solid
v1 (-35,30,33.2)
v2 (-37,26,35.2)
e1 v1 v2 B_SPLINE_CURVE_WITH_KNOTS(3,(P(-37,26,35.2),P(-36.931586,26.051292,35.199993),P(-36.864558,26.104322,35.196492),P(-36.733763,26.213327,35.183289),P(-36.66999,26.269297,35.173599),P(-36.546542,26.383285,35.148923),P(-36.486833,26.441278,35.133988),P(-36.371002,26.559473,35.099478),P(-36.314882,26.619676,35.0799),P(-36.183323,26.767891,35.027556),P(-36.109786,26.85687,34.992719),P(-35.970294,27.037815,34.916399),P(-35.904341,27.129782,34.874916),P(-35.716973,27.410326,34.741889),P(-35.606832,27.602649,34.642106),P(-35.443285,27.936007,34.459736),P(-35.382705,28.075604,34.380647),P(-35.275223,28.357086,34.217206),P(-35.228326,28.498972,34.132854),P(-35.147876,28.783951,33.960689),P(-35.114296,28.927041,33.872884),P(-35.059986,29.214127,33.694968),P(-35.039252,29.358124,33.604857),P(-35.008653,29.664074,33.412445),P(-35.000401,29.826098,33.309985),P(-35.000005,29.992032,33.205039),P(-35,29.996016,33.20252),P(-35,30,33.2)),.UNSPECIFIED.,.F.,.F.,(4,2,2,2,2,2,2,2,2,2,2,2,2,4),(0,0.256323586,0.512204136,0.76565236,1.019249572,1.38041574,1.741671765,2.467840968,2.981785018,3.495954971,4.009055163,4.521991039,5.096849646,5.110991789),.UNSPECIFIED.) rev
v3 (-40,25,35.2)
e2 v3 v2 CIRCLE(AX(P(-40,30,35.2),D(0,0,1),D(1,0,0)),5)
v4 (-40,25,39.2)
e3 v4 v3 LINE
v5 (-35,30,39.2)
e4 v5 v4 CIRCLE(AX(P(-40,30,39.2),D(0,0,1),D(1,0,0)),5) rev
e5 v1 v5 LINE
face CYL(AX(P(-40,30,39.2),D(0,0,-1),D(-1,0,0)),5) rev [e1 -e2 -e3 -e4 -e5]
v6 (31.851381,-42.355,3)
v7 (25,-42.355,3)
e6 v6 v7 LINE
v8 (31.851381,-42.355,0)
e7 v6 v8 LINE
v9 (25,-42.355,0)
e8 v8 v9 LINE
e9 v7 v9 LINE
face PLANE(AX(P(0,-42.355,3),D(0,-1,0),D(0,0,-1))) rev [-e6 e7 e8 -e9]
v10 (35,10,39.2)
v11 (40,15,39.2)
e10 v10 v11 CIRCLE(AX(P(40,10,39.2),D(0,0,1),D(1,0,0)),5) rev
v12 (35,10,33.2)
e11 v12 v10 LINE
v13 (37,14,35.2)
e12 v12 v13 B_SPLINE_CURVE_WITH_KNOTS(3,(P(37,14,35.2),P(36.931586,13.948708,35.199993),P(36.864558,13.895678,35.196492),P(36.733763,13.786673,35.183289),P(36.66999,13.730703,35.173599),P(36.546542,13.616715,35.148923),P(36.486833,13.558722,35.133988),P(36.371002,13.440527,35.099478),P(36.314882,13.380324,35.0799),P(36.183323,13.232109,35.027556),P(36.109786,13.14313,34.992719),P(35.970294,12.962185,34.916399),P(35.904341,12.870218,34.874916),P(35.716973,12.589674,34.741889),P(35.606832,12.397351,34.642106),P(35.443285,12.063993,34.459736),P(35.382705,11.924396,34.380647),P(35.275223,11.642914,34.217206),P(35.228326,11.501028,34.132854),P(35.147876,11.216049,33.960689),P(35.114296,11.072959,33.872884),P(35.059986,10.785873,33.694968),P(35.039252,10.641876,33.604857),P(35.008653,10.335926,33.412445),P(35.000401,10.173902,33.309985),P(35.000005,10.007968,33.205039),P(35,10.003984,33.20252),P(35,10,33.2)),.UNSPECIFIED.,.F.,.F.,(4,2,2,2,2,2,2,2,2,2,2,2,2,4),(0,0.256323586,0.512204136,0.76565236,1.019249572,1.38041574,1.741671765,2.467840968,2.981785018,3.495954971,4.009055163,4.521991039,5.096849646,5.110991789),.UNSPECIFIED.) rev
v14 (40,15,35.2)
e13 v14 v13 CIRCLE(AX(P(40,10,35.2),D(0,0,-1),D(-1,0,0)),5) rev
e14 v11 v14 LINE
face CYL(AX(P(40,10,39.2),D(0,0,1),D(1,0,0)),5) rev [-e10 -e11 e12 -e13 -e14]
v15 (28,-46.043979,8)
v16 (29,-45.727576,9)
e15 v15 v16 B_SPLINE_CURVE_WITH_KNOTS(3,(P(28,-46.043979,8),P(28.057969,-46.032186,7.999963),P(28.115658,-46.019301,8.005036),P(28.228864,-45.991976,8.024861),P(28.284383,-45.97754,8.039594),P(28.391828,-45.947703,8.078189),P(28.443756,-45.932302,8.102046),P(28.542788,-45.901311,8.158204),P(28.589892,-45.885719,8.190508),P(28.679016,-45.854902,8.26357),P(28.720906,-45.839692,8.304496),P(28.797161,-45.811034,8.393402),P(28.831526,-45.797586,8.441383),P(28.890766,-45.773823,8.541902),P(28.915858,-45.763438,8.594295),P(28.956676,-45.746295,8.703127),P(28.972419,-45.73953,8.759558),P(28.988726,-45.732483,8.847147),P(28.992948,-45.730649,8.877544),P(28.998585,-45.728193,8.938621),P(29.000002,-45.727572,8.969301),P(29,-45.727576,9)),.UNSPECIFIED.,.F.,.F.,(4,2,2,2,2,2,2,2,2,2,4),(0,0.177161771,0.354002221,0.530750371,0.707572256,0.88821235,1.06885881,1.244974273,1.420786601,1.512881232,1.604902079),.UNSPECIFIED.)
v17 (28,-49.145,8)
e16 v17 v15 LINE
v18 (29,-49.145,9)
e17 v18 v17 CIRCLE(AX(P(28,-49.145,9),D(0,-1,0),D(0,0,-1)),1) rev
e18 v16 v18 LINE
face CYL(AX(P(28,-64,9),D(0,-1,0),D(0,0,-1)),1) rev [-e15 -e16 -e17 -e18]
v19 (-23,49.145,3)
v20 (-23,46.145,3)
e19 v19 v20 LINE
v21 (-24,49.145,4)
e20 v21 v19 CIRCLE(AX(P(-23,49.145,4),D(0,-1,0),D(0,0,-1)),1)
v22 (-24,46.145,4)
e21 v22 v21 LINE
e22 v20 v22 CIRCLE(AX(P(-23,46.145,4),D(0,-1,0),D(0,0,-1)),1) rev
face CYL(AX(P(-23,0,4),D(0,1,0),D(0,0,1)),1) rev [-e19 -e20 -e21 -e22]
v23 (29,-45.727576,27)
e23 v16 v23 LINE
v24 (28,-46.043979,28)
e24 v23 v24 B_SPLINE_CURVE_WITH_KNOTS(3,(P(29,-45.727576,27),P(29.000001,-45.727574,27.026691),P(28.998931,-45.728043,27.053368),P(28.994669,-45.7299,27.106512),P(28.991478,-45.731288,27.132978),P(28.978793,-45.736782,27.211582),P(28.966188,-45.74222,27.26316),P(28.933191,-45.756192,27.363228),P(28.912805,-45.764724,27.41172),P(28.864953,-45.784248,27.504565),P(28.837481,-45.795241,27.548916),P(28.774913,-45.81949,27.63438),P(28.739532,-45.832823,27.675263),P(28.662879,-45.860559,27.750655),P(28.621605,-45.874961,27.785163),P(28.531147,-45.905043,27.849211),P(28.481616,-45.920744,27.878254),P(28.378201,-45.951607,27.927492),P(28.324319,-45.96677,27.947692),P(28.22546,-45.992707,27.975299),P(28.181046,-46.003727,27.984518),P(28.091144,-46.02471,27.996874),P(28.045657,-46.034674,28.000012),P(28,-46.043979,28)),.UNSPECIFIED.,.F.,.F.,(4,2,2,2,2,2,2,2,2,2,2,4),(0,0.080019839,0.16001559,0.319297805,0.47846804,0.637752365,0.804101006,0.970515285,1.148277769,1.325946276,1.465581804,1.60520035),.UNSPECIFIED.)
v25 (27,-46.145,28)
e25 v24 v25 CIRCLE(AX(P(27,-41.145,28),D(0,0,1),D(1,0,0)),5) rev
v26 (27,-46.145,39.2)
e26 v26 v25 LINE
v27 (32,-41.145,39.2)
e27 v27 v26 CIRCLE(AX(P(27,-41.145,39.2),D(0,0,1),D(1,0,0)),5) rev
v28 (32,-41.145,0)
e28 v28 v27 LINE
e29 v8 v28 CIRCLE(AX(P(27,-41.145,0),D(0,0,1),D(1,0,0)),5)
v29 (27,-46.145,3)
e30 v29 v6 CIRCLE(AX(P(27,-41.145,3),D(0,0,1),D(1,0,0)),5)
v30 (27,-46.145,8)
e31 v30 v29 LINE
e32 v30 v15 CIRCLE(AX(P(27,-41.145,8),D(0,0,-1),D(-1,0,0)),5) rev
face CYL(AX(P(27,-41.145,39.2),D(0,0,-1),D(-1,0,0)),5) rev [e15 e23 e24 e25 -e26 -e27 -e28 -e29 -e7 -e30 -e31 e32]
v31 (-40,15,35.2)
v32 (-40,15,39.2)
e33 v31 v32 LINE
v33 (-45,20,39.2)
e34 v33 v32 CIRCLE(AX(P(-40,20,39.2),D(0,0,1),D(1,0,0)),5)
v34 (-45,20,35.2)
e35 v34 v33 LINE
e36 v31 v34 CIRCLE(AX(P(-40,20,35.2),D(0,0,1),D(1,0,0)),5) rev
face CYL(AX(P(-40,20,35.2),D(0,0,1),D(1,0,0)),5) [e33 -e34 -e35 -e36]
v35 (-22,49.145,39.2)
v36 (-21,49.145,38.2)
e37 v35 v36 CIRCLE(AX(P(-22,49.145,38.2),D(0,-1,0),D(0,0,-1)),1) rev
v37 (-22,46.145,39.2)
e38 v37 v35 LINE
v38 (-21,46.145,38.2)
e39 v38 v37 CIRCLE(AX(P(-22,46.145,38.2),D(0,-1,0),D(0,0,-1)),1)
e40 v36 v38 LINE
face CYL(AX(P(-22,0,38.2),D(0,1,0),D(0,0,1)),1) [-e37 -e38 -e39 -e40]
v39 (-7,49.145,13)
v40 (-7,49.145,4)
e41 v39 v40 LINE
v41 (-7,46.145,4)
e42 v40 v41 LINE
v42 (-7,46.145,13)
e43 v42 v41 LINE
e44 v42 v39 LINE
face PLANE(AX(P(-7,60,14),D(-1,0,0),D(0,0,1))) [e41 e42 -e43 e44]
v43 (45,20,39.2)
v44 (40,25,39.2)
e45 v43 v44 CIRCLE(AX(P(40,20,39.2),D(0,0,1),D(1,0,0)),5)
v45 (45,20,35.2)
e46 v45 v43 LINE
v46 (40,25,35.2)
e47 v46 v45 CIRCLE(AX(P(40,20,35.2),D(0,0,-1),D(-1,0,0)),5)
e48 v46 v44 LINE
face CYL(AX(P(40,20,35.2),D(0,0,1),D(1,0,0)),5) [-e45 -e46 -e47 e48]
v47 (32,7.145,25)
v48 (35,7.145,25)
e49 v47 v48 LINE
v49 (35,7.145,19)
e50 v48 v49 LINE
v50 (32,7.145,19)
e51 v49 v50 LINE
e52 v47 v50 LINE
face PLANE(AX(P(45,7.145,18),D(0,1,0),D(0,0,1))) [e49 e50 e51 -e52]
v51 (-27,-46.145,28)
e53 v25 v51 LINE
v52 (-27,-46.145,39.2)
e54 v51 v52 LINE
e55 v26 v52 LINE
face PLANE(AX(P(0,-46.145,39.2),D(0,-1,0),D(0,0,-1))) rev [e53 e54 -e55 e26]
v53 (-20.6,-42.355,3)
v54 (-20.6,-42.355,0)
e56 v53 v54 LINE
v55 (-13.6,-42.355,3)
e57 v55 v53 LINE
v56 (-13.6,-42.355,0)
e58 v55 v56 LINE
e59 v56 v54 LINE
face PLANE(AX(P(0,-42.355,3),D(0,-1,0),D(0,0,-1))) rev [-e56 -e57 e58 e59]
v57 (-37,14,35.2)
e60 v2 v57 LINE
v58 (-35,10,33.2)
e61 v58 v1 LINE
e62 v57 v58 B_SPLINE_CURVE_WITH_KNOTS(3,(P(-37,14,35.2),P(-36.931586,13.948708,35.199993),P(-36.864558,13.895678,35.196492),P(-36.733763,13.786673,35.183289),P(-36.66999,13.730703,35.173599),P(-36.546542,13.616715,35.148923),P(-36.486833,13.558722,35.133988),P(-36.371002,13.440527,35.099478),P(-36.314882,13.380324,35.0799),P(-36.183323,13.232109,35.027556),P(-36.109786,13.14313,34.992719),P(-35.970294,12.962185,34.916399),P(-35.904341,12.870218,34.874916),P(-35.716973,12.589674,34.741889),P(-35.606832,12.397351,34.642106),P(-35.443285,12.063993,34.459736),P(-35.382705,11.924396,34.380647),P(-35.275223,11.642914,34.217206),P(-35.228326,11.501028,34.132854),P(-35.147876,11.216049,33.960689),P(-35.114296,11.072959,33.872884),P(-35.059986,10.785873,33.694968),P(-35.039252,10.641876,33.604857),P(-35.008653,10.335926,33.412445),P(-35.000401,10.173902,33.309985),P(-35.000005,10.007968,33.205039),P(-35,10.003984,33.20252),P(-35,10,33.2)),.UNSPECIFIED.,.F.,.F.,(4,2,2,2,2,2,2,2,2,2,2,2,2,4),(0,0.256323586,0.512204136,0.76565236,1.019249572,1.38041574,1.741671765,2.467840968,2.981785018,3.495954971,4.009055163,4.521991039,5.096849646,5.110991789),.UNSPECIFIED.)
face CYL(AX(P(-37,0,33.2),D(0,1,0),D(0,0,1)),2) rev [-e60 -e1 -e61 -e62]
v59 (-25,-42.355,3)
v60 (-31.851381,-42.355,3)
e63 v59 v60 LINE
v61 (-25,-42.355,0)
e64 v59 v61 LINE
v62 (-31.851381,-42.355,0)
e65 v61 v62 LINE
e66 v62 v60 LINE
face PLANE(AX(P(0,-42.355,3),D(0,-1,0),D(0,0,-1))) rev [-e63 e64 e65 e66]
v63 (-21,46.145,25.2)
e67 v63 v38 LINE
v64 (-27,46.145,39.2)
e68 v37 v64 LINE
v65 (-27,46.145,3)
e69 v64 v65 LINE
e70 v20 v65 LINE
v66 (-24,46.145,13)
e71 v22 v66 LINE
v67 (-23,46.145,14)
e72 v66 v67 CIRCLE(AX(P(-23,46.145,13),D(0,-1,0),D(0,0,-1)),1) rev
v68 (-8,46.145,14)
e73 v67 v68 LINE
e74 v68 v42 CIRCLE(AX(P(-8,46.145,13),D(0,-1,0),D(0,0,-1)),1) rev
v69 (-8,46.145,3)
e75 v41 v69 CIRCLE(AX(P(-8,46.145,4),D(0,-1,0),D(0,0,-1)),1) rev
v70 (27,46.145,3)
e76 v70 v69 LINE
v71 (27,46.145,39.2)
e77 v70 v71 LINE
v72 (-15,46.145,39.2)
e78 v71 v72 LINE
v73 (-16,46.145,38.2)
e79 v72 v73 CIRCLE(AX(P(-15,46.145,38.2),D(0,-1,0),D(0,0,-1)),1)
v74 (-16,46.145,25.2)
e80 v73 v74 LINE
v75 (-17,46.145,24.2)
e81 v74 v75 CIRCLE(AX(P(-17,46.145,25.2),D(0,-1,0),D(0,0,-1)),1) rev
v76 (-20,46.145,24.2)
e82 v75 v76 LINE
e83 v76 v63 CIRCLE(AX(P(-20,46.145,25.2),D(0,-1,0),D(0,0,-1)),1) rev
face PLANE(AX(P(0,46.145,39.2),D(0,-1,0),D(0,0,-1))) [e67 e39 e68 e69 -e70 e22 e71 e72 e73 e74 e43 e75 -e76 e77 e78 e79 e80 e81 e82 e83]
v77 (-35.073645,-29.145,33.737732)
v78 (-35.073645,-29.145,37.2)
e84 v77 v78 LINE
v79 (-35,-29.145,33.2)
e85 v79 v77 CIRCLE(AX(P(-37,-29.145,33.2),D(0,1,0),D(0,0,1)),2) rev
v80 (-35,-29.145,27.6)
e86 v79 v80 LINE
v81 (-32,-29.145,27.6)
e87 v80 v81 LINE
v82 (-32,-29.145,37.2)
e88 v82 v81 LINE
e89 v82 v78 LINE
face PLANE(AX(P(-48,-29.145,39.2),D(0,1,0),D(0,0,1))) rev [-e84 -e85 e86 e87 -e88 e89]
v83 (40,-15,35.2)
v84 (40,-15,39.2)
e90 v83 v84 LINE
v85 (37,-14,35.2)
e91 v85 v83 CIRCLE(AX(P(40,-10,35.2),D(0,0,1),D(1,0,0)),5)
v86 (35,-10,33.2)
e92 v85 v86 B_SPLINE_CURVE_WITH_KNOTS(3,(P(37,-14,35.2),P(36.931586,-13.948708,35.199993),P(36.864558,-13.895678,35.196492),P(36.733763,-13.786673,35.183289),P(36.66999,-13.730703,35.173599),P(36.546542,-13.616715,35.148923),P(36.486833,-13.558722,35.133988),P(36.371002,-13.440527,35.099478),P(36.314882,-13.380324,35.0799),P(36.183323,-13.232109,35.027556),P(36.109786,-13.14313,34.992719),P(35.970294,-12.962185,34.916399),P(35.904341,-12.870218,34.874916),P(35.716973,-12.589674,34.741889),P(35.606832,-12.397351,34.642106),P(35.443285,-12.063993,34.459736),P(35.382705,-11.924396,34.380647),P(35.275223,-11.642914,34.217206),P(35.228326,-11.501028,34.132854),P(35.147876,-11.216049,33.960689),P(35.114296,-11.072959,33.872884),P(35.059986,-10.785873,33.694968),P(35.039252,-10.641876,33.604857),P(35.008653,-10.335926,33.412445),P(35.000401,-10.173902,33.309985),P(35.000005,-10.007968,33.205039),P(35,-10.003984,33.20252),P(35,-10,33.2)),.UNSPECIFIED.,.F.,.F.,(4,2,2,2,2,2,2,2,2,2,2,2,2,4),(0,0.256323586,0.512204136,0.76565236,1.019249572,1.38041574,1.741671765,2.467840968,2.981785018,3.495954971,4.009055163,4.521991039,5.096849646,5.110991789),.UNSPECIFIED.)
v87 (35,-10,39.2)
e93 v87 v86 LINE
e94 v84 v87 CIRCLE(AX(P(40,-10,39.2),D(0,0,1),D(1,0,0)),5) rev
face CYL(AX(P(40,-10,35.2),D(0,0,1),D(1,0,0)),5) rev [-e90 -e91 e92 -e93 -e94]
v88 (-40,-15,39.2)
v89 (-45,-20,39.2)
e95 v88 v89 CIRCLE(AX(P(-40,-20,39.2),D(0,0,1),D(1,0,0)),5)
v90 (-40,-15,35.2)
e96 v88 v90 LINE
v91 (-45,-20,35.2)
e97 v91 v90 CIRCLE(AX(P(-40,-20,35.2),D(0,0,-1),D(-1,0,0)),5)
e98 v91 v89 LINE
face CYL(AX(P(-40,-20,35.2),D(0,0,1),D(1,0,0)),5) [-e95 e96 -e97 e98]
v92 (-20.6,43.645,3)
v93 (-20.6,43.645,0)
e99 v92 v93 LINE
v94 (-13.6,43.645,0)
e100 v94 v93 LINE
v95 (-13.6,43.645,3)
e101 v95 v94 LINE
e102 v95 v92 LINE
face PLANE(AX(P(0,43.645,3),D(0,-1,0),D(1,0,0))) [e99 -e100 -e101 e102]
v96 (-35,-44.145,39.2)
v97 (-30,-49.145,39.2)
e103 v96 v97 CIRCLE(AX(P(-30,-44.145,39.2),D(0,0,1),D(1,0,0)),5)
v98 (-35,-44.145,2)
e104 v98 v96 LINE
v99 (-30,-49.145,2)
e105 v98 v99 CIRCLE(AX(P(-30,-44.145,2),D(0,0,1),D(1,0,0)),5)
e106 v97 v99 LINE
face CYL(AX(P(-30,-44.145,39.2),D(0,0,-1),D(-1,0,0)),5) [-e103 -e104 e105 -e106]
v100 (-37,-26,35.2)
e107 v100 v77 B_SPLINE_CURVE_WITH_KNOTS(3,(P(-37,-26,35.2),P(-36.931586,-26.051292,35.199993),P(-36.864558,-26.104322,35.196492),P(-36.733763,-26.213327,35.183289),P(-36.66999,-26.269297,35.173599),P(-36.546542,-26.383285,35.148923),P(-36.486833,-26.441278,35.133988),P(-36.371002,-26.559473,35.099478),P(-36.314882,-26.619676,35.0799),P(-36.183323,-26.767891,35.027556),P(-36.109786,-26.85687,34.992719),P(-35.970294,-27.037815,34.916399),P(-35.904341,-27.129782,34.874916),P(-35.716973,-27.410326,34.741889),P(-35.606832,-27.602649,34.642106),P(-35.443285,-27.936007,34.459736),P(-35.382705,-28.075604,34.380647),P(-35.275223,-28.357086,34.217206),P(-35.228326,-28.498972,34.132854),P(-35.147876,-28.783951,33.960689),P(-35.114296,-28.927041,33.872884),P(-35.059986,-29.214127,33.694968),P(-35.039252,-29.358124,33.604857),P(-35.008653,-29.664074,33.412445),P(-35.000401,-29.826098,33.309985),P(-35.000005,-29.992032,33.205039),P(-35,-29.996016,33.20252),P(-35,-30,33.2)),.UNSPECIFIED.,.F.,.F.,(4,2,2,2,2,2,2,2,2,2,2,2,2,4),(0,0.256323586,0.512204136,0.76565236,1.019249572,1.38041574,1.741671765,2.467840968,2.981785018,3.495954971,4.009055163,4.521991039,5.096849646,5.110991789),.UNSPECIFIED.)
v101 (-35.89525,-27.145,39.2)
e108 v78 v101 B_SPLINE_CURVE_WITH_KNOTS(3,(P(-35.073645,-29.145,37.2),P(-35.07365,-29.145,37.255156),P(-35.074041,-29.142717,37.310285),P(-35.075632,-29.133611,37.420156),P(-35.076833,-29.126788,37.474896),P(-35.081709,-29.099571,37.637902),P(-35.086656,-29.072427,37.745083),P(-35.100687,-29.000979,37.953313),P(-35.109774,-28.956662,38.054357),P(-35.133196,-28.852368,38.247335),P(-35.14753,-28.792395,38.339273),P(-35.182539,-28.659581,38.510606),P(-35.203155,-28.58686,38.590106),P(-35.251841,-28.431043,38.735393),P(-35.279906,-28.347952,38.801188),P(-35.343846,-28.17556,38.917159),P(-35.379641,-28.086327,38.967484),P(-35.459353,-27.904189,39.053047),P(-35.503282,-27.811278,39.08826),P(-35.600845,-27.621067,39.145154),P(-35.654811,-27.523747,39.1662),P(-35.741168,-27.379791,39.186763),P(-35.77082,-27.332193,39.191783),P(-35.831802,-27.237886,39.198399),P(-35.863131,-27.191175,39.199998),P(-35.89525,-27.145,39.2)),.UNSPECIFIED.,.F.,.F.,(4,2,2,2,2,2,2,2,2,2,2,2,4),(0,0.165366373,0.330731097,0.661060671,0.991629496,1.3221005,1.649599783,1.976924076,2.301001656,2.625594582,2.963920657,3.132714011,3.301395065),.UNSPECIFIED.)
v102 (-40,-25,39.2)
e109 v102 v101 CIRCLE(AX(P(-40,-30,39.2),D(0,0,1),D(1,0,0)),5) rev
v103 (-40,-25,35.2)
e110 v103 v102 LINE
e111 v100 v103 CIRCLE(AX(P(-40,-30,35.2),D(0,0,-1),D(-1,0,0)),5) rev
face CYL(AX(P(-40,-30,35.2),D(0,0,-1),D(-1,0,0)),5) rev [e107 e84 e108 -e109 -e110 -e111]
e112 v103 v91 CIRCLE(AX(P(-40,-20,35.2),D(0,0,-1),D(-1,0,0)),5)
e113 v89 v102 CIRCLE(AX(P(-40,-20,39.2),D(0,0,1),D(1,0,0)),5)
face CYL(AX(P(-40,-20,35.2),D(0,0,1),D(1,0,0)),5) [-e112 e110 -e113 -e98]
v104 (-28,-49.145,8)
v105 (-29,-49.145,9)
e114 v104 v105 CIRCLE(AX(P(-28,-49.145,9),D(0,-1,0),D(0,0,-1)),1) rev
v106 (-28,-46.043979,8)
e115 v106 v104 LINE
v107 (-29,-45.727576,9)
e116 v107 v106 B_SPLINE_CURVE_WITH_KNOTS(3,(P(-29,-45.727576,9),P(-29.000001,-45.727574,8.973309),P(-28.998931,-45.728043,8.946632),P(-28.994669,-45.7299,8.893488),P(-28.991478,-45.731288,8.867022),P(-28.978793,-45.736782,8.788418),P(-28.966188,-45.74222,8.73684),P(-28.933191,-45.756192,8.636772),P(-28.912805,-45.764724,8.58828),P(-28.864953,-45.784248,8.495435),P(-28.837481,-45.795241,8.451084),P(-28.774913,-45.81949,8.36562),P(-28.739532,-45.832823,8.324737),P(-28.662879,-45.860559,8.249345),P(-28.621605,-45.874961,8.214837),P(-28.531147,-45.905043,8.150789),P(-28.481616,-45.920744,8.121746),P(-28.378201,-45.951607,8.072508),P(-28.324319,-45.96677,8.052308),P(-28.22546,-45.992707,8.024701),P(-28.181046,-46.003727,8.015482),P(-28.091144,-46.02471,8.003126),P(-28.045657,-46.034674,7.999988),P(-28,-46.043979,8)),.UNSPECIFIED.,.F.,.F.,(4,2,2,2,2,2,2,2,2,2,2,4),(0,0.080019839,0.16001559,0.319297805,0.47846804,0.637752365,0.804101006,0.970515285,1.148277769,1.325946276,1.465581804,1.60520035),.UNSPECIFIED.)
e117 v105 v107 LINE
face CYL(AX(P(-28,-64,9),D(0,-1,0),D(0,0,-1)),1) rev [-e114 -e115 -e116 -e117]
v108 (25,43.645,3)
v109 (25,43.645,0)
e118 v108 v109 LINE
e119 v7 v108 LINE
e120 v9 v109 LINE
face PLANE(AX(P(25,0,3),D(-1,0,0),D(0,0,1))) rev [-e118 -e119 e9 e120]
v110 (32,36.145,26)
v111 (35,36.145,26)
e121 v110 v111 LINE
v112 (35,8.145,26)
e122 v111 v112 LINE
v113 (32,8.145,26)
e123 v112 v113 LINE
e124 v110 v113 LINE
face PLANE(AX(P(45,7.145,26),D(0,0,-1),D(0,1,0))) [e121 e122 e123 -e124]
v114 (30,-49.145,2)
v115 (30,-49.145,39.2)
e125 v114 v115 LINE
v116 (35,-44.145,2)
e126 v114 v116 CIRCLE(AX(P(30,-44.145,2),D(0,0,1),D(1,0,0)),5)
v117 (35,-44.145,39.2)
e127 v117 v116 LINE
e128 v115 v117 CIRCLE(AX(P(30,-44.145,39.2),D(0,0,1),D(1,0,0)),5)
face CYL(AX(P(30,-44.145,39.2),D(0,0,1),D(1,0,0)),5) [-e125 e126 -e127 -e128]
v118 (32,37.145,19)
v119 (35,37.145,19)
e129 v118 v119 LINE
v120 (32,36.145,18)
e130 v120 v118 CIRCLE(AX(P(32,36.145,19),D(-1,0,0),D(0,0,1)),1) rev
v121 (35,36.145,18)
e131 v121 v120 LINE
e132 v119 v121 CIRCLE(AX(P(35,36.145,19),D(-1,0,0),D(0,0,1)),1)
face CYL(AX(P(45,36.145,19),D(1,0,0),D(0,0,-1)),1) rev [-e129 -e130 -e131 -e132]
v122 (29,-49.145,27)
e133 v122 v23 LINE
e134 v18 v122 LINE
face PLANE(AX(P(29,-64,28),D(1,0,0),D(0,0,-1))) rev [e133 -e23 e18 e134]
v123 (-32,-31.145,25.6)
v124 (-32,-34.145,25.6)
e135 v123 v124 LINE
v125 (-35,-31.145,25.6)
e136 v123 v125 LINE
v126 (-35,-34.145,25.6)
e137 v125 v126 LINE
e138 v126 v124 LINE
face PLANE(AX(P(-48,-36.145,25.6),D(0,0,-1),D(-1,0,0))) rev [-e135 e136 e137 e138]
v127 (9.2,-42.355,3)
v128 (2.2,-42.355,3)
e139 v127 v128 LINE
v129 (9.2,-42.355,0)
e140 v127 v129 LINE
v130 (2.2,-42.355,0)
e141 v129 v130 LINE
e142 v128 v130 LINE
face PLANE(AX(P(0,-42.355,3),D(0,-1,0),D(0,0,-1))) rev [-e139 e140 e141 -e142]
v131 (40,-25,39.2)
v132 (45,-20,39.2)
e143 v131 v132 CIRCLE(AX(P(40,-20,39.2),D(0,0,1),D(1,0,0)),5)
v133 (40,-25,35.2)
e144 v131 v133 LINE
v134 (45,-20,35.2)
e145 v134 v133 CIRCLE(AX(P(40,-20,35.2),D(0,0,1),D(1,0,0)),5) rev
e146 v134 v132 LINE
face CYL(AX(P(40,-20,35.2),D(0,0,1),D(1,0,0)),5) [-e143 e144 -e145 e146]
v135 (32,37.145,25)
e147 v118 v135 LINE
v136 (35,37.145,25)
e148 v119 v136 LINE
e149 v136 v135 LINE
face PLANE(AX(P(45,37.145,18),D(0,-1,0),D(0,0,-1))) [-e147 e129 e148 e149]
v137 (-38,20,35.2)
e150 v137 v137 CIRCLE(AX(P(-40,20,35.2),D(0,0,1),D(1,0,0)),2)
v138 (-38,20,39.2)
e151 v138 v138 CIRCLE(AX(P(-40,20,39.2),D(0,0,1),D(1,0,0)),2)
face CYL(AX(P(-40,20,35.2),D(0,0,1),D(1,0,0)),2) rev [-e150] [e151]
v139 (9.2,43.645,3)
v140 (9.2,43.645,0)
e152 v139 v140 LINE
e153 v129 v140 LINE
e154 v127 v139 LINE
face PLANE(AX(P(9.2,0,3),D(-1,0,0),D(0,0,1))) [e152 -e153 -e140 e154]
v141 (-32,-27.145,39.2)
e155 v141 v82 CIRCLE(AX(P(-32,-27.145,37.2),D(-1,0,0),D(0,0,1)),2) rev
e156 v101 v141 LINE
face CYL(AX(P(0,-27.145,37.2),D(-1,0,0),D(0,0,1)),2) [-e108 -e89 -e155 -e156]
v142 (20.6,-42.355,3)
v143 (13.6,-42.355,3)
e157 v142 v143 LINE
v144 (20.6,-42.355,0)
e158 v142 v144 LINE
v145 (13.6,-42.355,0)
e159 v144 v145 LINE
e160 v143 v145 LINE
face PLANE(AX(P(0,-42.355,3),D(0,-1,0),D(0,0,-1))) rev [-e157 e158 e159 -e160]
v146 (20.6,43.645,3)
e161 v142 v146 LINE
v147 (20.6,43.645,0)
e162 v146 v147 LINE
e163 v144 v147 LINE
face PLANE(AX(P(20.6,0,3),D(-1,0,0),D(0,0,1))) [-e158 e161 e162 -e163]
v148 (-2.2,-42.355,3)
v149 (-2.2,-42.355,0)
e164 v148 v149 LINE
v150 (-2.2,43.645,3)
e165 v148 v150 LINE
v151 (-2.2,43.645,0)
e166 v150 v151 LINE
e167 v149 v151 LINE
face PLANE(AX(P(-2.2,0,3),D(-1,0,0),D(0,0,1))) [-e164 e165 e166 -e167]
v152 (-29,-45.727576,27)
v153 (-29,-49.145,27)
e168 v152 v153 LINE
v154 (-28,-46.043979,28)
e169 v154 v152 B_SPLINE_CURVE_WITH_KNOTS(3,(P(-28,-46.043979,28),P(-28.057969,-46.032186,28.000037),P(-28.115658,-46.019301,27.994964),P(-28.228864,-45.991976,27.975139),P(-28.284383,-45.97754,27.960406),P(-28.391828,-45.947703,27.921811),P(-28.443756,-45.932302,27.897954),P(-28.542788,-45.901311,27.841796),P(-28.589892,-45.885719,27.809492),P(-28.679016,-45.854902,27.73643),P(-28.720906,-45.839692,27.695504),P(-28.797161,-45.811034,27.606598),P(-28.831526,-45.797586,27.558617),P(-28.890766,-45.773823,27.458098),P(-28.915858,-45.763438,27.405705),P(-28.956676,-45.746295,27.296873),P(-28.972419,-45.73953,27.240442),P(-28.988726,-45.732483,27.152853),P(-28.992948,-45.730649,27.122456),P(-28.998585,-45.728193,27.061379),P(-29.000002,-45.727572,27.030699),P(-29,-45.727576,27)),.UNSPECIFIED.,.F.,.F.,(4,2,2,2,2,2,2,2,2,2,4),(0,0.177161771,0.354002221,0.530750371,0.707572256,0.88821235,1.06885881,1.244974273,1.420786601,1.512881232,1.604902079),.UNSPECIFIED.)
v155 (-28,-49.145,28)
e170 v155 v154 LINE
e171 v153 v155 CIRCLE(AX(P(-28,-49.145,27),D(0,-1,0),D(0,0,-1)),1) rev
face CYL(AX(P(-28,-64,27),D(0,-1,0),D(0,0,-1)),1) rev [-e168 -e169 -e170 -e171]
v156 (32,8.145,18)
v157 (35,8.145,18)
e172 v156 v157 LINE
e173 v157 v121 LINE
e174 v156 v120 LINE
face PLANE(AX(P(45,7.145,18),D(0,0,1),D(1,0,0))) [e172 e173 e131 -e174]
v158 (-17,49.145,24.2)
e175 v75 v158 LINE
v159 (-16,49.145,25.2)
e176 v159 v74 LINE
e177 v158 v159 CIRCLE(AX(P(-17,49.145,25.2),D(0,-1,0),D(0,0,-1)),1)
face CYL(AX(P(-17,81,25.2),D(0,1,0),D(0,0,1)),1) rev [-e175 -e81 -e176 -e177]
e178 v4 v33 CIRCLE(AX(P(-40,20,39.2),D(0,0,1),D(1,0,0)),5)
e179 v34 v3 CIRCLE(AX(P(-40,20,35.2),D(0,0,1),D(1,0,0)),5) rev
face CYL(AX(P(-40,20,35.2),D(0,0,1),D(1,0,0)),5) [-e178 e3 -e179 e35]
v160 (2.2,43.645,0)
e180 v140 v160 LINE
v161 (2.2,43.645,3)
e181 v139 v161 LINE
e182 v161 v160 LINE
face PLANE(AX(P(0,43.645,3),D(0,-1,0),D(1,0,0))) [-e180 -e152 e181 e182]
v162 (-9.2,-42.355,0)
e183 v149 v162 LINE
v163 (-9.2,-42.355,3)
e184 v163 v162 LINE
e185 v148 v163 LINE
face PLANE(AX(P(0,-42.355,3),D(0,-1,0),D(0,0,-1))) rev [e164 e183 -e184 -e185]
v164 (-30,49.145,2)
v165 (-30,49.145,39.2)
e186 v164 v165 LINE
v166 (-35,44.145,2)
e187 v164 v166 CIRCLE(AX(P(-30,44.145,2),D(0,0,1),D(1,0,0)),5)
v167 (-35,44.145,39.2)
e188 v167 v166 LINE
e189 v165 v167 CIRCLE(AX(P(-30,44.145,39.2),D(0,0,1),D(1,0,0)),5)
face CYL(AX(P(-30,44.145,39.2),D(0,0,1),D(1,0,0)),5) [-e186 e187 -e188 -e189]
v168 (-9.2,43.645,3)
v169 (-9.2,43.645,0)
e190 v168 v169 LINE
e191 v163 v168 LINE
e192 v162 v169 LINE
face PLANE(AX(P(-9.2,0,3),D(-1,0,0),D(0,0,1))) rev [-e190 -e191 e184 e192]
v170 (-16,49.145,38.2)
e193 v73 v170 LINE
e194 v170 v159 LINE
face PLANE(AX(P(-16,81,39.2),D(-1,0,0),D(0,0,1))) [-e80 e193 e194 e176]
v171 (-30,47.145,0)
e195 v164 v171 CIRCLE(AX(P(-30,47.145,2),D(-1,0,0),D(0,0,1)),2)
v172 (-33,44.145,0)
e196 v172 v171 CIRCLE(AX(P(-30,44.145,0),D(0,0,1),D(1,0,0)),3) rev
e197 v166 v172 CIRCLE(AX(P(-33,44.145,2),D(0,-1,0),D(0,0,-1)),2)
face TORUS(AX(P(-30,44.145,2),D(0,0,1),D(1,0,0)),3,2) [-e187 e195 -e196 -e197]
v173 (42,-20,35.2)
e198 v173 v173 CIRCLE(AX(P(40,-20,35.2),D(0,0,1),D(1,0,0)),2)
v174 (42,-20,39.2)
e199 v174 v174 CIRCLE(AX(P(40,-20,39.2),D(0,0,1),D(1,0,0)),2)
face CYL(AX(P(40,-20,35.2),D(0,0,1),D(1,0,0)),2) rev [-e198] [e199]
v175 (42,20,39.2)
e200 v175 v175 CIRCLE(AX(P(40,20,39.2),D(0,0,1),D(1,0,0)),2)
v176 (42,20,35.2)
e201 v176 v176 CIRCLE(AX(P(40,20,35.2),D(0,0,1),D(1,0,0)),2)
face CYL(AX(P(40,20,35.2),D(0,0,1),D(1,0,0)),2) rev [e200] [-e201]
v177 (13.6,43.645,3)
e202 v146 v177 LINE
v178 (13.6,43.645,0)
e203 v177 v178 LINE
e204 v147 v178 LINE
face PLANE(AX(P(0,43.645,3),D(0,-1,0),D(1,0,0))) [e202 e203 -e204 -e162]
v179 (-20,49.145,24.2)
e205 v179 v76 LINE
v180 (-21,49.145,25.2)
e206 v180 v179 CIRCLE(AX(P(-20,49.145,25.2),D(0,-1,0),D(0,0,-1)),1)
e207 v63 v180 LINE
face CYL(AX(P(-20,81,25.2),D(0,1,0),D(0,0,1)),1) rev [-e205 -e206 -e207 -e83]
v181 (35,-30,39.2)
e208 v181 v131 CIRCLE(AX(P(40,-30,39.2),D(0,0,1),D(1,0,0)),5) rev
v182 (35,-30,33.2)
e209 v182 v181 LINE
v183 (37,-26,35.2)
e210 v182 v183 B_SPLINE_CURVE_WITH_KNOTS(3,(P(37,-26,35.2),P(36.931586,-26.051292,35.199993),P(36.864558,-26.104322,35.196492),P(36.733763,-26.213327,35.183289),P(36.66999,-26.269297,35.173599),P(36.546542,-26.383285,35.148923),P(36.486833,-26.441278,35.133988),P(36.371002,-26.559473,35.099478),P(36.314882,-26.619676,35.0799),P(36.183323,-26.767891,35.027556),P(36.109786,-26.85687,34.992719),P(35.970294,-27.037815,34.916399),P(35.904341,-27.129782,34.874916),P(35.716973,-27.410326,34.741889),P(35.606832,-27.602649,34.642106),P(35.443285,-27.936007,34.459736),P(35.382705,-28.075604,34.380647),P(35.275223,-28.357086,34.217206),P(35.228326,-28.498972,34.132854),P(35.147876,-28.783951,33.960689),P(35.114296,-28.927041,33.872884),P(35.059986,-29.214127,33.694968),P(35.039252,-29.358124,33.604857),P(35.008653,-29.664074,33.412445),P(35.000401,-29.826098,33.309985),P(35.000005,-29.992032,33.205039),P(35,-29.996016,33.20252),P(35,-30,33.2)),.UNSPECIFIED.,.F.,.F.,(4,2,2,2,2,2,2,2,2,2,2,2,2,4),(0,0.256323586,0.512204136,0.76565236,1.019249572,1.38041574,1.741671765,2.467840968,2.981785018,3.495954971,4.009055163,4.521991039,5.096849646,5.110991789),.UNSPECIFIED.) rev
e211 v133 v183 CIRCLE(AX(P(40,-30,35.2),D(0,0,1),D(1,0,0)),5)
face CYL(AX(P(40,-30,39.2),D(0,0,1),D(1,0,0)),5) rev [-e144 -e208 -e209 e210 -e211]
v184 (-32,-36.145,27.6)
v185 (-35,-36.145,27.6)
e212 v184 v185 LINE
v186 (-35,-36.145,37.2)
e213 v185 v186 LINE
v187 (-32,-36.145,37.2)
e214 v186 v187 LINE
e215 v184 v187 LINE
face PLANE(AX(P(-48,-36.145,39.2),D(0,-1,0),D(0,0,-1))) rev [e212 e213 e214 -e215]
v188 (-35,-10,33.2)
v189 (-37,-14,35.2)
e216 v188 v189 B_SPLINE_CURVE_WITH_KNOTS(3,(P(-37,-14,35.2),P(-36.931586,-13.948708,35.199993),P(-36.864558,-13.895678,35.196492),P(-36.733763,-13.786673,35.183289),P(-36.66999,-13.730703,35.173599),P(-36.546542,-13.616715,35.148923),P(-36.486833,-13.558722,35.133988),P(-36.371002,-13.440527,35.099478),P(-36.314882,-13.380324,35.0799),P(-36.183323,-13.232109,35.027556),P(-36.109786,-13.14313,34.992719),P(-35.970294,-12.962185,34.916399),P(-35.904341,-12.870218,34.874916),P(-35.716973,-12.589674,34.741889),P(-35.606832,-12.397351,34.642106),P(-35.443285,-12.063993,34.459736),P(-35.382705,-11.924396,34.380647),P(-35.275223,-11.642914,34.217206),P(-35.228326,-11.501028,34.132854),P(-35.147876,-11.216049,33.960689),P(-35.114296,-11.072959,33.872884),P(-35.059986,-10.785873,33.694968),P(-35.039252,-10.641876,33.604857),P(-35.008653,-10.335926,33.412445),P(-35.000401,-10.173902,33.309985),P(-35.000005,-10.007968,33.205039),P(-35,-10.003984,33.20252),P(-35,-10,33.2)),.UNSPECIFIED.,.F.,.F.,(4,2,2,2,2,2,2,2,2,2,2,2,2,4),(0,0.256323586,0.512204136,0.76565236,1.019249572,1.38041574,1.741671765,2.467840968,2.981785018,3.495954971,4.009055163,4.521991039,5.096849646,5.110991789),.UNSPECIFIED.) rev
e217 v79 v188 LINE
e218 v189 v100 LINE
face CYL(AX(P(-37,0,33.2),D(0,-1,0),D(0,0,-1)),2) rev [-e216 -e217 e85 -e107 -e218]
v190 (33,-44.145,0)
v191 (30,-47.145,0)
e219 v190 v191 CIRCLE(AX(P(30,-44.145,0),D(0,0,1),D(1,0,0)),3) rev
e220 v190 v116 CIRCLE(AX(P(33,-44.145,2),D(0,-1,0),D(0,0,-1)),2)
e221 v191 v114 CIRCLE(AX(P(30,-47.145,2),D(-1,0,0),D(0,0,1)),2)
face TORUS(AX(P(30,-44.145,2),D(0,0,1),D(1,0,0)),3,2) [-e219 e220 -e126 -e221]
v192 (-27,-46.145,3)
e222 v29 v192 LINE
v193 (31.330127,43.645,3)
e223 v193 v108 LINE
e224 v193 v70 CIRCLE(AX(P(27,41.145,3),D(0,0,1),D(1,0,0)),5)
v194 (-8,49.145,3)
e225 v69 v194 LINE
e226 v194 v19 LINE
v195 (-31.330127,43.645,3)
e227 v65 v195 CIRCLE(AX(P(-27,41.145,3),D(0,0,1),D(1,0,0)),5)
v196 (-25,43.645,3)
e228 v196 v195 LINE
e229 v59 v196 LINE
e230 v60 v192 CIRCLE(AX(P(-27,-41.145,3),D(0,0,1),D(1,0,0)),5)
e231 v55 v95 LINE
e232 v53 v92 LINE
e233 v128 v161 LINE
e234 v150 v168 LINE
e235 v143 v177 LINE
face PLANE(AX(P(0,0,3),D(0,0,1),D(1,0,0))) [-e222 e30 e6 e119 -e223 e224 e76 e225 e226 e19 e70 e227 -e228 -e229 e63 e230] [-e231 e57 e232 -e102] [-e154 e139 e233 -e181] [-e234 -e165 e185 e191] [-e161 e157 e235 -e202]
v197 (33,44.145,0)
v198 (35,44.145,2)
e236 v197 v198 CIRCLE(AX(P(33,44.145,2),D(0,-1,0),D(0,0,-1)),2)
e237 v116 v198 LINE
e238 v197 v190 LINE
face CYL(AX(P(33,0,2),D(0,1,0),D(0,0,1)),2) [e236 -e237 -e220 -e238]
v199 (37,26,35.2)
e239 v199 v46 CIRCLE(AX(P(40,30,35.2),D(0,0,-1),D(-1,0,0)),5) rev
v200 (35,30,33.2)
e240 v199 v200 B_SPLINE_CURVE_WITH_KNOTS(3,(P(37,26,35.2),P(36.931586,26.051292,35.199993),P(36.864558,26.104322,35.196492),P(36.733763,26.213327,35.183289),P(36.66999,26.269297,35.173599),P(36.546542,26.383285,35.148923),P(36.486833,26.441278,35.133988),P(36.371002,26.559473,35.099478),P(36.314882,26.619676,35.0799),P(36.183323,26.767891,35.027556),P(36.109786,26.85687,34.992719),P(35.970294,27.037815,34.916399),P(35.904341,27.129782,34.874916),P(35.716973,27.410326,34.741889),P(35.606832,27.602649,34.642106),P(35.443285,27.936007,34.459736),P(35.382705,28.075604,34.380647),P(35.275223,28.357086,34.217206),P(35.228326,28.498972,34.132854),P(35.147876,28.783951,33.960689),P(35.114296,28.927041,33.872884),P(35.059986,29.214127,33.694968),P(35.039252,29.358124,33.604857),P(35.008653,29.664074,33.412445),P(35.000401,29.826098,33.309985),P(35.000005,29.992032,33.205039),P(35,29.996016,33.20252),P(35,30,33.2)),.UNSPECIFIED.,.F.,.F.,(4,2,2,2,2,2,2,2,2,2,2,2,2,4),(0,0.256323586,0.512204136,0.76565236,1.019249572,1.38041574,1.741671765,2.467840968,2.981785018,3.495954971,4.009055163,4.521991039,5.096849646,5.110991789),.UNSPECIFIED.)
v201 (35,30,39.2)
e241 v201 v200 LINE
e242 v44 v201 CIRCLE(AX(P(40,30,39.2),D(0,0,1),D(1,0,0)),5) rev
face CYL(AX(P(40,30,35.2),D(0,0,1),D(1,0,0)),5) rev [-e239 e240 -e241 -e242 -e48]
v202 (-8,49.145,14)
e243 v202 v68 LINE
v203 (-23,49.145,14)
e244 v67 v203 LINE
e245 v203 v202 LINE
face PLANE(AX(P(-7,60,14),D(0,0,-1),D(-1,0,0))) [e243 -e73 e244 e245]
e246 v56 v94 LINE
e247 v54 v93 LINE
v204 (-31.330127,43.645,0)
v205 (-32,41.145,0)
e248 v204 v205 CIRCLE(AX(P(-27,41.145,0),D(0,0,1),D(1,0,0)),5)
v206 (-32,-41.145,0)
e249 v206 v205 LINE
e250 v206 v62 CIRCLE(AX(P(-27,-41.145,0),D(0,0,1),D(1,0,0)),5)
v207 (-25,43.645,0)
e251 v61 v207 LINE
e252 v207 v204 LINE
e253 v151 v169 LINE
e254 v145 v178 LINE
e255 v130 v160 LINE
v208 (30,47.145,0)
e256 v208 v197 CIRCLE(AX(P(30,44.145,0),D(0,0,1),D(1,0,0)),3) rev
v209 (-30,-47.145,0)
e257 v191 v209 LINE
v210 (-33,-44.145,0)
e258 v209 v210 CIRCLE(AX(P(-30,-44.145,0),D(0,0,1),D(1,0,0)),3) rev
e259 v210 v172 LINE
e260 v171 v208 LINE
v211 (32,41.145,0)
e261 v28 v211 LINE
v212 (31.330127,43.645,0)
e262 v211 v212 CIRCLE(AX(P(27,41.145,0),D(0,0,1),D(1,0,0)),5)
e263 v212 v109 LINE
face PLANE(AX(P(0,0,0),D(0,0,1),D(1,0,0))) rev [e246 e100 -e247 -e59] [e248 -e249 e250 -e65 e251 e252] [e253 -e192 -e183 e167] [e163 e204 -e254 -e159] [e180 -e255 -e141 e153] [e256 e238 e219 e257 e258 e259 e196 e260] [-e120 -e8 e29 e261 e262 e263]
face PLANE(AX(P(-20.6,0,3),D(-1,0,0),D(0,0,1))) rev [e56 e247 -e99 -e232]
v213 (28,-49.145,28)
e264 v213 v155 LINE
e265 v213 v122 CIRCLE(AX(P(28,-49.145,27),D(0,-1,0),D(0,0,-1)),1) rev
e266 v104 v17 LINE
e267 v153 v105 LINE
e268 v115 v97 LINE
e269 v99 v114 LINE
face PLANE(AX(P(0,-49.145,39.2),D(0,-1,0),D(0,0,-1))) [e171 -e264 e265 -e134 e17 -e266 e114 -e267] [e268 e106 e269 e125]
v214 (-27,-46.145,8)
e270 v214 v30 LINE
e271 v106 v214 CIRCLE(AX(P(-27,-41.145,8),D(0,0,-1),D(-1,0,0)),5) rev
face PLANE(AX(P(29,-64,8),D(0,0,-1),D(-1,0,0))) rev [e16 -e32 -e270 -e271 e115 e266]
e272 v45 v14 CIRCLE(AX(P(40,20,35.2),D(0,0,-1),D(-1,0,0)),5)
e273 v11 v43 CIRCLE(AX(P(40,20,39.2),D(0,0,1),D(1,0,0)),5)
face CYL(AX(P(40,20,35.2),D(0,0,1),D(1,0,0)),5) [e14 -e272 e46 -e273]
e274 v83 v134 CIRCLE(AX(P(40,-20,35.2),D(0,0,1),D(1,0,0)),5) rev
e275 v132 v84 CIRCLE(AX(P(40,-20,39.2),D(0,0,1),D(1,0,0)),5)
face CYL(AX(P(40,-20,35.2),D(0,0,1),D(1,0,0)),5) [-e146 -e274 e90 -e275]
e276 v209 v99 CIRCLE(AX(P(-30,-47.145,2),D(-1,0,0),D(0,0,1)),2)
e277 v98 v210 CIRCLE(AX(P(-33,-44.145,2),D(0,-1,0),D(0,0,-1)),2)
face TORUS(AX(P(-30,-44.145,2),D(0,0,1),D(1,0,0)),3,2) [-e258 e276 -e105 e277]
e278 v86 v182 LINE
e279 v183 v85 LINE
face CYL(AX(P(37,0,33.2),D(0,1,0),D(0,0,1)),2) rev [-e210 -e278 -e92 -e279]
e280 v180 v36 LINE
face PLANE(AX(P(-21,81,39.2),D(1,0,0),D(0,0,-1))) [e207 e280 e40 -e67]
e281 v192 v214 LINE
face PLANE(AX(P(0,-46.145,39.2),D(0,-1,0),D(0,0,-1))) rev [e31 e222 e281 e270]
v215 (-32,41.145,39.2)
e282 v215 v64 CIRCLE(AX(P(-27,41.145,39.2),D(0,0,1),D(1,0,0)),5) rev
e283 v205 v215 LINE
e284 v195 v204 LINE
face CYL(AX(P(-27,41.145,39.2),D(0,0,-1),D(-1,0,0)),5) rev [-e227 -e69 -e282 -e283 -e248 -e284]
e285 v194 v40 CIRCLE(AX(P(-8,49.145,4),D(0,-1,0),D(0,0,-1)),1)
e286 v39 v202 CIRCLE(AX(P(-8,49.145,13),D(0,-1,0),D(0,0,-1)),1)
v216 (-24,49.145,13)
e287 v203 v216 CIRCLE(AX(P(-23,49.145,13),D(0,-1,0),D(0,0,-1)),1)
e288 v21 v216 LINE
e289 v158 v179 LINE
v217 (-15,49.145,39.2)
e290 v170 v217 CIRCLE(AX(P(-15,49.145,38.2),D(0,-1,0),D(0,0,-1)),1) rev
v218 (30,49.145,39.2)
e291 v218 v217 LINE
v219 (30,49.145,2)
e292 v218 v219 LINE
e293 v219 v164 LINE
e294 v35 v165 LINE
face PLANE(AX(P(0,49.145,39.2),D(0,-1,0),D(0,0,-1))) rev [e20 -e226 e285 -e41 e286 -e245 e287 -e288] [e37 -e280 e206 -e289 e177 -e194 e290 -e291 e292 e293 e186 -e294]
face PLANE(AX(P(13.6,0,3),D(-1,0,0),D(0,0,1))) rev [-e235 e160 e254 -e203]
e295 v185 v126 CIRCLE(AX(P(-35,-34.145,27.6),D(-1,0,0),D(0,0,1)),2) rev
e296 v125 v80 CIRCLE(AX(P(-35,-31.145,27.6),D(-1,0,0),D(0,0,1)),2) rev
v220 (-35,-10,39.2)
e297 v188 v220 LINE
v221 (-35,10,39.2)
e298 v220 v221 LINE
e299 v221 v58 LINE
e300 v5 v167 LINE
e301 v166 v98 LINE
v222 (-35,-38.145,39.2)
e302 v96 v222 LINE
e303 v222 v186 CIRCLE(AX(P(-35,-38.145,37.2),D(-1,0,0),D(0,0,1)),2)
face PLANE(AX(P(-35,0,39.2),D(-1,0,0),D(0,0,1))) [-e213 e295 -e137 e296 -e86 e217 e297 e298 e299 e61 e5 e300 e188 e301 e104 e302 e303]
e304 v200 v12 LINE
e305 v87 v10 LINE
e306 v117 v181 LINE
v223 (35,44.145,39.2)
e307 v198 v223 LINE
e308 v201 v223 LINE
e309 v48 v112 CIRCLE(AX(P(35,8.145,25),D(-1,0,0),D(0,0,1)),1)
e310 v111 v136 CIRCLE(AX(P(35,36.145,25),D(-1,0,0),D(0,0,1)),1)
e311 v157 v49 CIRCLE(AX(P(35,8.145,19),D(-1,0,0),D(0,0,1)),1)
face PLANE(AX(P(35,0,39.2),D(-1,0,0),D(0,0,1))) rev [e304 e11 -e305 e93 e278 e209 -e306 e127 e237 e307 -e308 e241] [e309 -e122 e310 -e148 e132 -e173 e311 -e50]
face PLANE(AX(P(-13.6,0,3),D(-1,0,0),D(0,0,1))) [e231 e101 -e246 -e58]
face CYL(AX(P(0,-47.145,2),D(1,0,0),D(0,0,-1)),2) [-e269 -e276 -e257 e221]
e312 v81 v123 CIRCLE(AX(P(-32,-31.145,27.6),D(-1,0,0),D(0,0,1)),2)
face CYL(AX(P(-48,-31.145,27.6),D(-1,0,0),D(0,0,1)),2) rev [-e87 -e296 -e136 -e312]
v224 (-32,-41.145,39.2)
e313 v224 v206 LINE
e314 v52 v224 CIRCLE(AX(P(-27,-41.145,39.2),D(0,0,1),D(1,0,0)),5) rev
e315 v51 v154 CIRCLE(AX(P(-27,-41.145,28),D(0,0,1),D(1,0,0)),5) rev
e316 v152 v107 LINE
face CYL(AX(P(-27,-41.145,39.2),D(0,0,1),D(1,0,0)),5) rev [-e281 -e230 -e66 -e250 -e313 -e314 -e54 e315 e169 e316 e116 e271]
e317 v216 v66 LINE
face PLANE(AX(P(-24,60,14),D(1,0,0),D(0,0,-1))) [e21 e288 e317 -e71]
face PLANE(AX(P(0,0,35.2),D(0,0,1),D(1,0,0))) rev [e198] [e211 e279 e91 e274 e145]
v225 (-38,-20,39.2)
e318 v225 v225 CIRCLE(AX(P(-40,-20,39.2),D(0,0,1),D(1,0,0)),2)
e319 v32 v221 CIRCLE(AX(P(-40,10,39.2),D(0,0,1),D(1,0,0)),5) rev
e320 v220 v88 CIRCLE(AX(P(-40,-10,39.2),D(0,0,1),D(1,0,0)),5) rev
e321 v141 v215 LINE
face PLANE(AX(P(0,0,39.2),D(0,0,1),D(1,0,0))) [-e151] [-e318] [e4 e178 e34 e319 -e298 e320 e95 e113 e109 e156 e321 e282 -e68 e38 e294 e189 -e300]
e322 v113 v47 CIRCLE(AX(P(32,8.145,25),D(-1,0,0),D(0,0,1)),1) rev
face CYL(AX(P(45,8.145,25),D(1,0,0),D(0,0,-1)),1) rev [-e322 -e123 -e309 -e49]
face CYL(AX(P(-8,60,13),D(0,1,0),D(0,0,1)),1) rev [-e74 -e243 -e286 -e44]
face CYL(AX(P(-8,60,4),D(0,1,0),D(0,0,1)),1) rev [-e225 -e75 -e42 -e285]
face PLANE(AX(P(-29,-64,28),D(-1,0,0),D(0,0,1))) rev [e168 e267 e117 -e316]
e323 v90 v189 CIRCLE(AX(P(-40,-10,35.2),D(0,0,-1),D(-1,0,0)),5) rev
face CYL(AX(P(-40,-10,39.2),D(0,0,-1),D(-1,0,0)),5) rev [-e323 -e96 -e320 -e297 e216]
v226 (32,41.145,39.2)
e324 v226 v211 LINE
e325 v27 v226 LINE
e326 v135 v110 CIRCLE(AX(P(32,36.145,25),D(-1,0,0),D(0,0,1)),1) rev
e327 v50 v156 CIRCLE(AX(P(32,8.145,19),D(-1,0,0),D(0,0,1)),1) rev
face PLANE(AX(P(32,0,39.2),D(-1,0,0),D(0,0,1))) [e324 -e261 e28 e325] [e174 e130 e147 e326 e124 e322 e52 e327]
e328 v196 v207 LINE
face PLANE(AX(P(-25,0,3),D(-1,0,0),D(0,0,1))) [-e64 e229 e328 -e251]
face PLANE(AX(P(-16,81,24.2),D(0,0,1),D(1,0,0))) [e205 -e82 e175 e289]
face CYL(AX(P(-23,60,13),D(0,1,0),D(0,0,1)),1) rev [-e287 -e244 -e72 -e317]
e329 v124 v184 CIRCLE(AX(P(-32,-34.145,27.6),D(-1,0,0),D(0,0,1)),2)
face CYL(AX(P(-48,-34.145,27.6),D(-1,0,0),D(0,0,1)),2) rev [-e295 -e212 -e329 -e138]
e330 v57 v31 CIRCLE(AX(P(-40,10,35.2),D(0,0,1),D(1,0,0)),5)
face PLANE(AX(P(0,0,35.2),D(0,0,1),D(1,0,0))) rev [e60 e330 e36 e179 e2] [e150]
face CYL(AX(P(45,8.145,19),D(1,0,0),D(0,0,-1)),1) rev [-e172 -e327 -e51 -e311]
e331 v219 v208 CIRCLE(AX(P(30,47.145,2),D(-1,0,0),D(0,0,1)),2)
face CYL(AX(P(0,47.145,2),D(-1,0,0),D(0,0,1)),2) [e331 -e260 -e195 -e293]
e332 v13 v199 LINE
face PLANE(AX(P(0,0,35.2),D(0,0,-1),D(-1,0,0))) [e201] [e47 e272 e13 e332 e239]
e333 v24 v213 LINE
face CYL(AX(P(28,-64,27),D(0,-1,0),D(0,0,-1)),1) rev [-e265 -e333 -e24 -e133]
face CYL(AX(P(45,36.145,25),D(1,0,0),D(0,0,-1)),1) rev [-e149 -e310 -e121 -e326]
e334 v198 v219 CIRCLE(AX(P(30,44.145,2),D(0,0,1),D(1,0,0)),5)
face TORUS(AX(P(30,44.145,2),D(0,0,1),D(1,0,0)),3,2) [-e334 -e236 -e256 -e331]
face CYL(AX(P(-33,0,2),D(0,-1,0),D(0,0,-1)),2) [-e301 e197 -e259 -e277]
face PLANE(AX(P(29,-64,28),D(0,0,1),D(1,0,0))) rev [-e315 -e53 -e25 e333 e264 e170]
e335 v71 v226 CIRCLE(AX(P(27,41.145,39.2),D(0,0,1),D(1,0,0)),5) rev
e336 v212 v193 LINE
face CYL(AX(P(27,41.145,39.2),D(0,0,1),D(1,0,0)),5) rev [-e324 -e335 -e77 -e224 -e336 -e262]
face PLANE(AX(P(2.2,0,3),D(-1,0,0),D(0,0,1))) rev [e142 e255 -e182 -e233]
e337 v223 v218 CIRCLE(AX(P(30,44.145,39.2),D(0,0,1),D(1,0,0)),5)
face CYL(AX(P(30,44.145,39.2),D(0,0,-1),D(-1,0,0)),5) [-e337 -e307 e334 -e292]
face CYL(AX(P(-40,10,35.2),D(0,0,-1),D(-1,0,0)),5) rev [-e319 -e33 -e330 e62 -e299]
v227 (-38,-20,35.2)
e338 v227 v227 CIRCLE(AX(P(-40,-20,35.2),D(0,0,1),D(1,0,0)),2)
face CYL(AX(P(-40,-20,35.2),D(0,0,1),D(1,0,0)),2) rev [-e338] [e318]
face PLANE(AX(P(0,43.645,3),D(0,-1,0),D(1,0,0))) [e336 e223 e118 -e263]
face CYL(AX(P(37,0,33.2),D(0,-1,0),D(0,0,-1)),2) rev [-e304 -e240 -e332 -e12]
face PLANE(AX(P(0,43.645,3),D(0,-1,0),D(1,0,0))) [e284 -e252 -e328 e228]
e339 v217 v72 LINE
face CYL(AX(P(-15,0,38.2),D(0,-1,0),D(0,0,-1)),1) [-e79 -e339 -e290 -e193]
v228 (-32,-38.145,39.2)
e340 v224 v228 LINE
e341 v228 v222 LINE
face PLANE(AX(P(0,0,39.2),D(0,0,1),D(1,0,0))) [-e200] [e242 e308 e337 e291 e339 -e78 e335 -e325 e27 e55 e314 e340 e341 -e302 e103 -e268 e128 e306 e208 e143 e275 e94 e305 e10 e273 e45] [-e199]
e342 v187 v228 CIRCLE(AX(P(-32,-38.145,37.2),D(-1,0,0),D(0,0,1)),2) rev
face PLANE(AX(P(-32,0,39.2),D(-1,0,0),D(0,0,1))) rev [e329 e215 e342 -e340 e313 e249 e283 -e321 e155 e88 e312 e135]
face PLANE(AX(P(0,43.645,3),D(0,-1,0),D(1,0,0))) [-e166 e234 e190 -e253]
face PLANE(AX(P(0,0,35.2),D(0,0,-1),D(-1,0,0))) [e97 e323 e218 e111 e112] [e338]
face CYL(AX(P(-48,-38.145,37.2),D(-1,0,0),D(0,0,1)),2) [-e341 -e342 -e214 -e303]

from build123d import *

# Parameters (mm, degrees)
SKETCH1_W           = 7
SKETCH1_H           = 86
BOSS_EXTRUDE1_DEPTH = 3
SKETCH1_3_W         = 70
SKETCH1_3_H         = 98.29
SKETCH1_3_W_2       = 64
SKETCH1_3_H_2       = 92.29
BOSS_EXTRUDE2_DEPTH = 39.2
FILLET2_R           = 5
SKETCH2_W           = 58
SKETCH2_H           = 20
CUT_EXTRUDE1_DEPTH  = 64
FILLET3_R           = 1
SKETCH3_W           = 8
SKETCH3_H           = 30
CUT_EXTRUDE2_DEPTH  = 45
FILLET4_R           = 1
SKETCH4_W           = 5
SKETCH4_H           = 15
CUT_EXTRUDE3_DEPTH  = 81
FILLET5_R           = 1
SKETCH5_W           = 10
SKETCH5_H           = 10
SKETCH5_R           = 2
BOSS_EXTRUDE3_DEPTH = 4
FILLET6_R           = 5
FILLET7_R           = 5
FILLET8_R           = 2
FILLET9_R           = 2
SKETCH6_W           = 13.6
SKETCH6_H           = 7
CUT_EXTRUDE4_DEPTH  = 48
FILLET11_R          = 2
SKETCH7_W           = 17
SKETCH7_H           = 11
CUT_EXTRUDE5_DEPTH  = 60
FILLET12_R          = 1


with BuildPart() as part:
    # Sketch1 → Boss-Extrude1 (new body)
    with BuildSketch(Plane.XY):
        Polygon((-32, -46.145), (32, -46.145), (32, -42.355), (25, -42.355), (25, 43.645), (32, 43.645), (32, 46.145), (-32, 46.145), (-32, 43.645), (-25, 43.645), (-25, -42.355), (-32, -42.355), align=None)
        with Locations((-17.1, 0.645)):
            Rectangle(SKETCH1_W, SKETCH1_H, mode=Mode.SUBTRACT)
        with Locations((-5.7, 0.645)):
            Rectangle(SKETCH1_W, SKETCH1_H, mode=Mode.SUBTRACT)
        with Locations((5.7, 0.645)):
            Rectangle(SKETCH1_W, SKETCH1_H, mode=Mode.SUBTRACT)
        with Locations((17.1, 0.645)):
            Rectangle(SKETCH1_W, SKETCH1_H, mode=Mode.SUBTRACT)
    extrude(amount=BOSS_EXTRUDE1_DEPTH)

    # Sketch1<3> → Boss-Extrude2 (add)
    with BuildSketch(Plane.XY):
        Rectangle(SKETCH1_3_W, SKETCH1_3_H)
        Rectangle(SKETCH1_3_W_2, SKETCH1_3_H_2, mode=Mode.SUBTRACT)
    extrude(amount=BOSS_EXTRUDE2_DEPTH)

    # Fillet2
    fillet2_edges = [part.edges().sort_by_distance(p)[0] for p in [
        (-32, -46.145, 21.1),
        (32, -46.145, 21.1),
        (-32, 46.145, 21.1),
        (32, 46.145, 21.1),
        (35, -49.145, 19.6),
        (-35, -49.145, 19.6),
        (35, 49.145, 19.6),
        (-35, 49.145, 19.6),
    ]]
    fillet(fillet2_edges, radius=FILLET2_R)

    # Sketch2 → Cut-Extrude1 (cut)
    with BuildSketch(Plane(origin=(0, 0, 0), x_dir=(1, 0, 0), z_dir=(0, 1, 0))):
        with Locations((0, -18)):
            Rectangle(SKETCH2_W, SKETCH2_H)
    extrude(amount=-CUT_EXTRUDE1_DEPTH, mode=Mode.SUBTRACT)

    # Fillet3
    fillet3_edges = [part.edges().sort_by_distance(p)[0] for p in [
        (-29, -47.436287847, 28),
        (-29, -47.436287847, 8),
        (29, -47.436287847, 8),
        (29, -47.436287847, 28),
    ]]
    fillet(fillet3_edges, radius=FILLET3_R)

    # Sketch3 → Cut-Extrude2 (cut)
    with BuildSketch(Plane(origin=(0, 0, 0), x_dir=(0, 0, -1), z_dir=(1, 0, 0))):
        with Locations((-22, 22.145)):
            Rectangle(SKETCH3_W, SKETCH3_H)
    extrude(amount=CUT_EXTRUDE2_DEPTH, mode=Mode.SUBTRACT)

    # Fillet4
    fillet4_edges = [part.edges().sort_by_distance(p)[0] for p in [
        (33.5, 37.145, 26),
        (33.5, 7.145, 26),
        (33.5, 7.145, 18),
        (33.5, 37.145, 18),
    ]]
    fillet(fillet4_edges, radius=FILLET4_R)

    # Sketch4 → Cut-Extrude3 (cut)
    with BuildSketch(Plane(origin=(0, 0, 0), x_dir=(1, 0, 0), z_dir=(0, 1, 0))):
        with Locations((-18.5, -31.7)):
            Rectangle(SKETCH4_W, SKETCH4_H)
    extrude(amount=CUT_EXTRUDE3_DEPTH, mode=Mode.SUBTRACT)

    # Fillet5
    fillet5_edges = [part.edges().sort_by_distance(p)[0] for p in [
        (-16, 47.645, 39.2),
        (-21, 47.645, 39.2),
        (-16, 47.645, 24.2),
        (-21, 47.645, 24.2),
    ]]
    fillet(fillet5_edges, radius=FILLET5_R)

    # Sketch5 → Boss-Extrude3 (add)
    # profile 1 of 4: a face of its own
    with BuildSketch(Plane.XY.offset(39.2)):
        with Locations((40, 20)):
            Rectangle(SKETCH5_W, SKETCH5_H)
        with Locations((40, 20)):
            Circle(SKETCH5_R, mode=Mode.SUBTRACT)
    # profile 2 of 4: a face of its own
    with BuildSketch(Plane.XY.offset(39.2)):
        with Locations((40, -20)):
            Rectangle(SKETCH5_W, SKETCH5_H)
        with Locations((40, -20)):
            Circle(SKETCH5_R, mode=Mode.SUBTRACT)
    # profile 3 of 4: a face of its own
    with BuildSketch(Plane.XY.offset(39.2)):
        with Locations((-40, -20)):
            Rectangle(SKETCH5_W, SKETCH5_H)
        with Locations((-40, -20)):
            Circle(SKETCH5_R, mode=Mode.SUBTRACT)
    # profile 4 of 4: a face of its own
    with BuildSketch(Plane.XY.offset(39.2)):
        with Locations((-40, 20)):
            Rectangle(SKETCH5_W, SKETCH5_H)
        with Locations((-40, 20)):
            Circle(SKETCH5_R, mode=Mode.SUBTRACT)
    extrude(amount=-BOSS_EXTRUDE3_DEPTH)

    # Fillet6
    fillet6_edges = [part.edges().sort_by_distance(p)[0] for p in [
        (35, 15, 37.2),
        (35, 25, 37.2),
        (35, -25, 37.2),
        (35, -15, 37.2),
        (-35, -15, 37.2),
        (-35, -25, 37.2),
        (-35, 25, 37.2),
        (-35, 15, 37.2),
    ]]
    fillet(fillet6_edges, radius=FILLET6_R)

    # Fillet7
    fillet7_edges = [part.edges().sort_by_distance(p)[0] for p in [
        (-45, 25, 37.2),
        (-45, 15, 37.2),
        (-45, -15, 37.2),
        (-45, -25, 37.2),
        (45, -25, 37.2),
        (45, -15, 37.2),
        (45, 15, 37.2),
        (45, 25, 37.2),
    ]]
    fillet(fillet7_edges, radius=FILLET7_R - 0.0001)  # a hair under: the kernel refuses the full size

    # Fillet8
    fillet8_edges = [part.edges().sort_by_distance(p)[0] for p in [
        (35, 20, 35.2),
        (35, -20, 35.2),
        (-35, -20, 35.2),
        (-35, 20, 35.2),
    ]]
    fillet(fillet8_edges, radius=FILLET8_R)

    # Fillet9
    fillet9_edges = [part.edges().sort_by_distance(p)[0] for p in [
        (35, 0, 0),
        (-35, 0, 0),
        (0, 49.145, 0),
        (0, -49.145, 0),
        (-33.535533906, 47.680533906, 0),
        (33.535533906, 47.680533906, 0),
        (-33.535533906, -47.680533906, 0),
        (33.535533906, -47.680533906, 0),
    ]]
    fillet(fillet9_edges, radius=FILLET9_R)

    # Sketch6 → Cut-Extrude4 (cut)
    with BuildSketch(Plane(origin=(0, 0, 0), x_dir=(0, 0, -1), z_dir=(1, 0, 0))):
        with Locations((-32.4, -32.645)):
            Rectangle(SKETCH6_W, SKETCH6_H)
    extrude(amount=-CUT_EXTRUDE4_DEPTH, mode=Mode.SUBTRACT)

    # Fillet11
    fillet11_edges = [part.edges().sort_by_distance(p)[0] for p in [
        (-33.5, -29.145, 25.6),
        (-33.5, -36.145, 25.6),
        (-33.5, -36.145, 39.2),
        (-33.536822428, -29.145, 39.2),
    ]]
    fillet(fillet11_edges, radius=FILLET11_R)

    # Sketch7 → Cut-Extrude5 (cut)
    with BuildSketch(Plane(origin=(0, 0, 0), x_dir=(1, 0, 0), z_dir=(0, 1, 0))):
        with Locations((-15.5, -8.5)):
            Rectangle(SKETCH7_W, SKETCH7_H)
    extrude(amount=CUT_EXTRUDE5_DEPTH, mode=Mode.SUBTRACT)

    # Fillet12
    fillet12_edges = [part.edges().sort_by_distance(p)[0] for p in [
        (-24, 47.645, 14),
        (-7, 47.645, 3),
        (-24, 47.645, 3),
        (-7, 47.645, 14),
    ]]
    fillet(fillet12_edges, radius=FILLET12_R)


solid = part.part
